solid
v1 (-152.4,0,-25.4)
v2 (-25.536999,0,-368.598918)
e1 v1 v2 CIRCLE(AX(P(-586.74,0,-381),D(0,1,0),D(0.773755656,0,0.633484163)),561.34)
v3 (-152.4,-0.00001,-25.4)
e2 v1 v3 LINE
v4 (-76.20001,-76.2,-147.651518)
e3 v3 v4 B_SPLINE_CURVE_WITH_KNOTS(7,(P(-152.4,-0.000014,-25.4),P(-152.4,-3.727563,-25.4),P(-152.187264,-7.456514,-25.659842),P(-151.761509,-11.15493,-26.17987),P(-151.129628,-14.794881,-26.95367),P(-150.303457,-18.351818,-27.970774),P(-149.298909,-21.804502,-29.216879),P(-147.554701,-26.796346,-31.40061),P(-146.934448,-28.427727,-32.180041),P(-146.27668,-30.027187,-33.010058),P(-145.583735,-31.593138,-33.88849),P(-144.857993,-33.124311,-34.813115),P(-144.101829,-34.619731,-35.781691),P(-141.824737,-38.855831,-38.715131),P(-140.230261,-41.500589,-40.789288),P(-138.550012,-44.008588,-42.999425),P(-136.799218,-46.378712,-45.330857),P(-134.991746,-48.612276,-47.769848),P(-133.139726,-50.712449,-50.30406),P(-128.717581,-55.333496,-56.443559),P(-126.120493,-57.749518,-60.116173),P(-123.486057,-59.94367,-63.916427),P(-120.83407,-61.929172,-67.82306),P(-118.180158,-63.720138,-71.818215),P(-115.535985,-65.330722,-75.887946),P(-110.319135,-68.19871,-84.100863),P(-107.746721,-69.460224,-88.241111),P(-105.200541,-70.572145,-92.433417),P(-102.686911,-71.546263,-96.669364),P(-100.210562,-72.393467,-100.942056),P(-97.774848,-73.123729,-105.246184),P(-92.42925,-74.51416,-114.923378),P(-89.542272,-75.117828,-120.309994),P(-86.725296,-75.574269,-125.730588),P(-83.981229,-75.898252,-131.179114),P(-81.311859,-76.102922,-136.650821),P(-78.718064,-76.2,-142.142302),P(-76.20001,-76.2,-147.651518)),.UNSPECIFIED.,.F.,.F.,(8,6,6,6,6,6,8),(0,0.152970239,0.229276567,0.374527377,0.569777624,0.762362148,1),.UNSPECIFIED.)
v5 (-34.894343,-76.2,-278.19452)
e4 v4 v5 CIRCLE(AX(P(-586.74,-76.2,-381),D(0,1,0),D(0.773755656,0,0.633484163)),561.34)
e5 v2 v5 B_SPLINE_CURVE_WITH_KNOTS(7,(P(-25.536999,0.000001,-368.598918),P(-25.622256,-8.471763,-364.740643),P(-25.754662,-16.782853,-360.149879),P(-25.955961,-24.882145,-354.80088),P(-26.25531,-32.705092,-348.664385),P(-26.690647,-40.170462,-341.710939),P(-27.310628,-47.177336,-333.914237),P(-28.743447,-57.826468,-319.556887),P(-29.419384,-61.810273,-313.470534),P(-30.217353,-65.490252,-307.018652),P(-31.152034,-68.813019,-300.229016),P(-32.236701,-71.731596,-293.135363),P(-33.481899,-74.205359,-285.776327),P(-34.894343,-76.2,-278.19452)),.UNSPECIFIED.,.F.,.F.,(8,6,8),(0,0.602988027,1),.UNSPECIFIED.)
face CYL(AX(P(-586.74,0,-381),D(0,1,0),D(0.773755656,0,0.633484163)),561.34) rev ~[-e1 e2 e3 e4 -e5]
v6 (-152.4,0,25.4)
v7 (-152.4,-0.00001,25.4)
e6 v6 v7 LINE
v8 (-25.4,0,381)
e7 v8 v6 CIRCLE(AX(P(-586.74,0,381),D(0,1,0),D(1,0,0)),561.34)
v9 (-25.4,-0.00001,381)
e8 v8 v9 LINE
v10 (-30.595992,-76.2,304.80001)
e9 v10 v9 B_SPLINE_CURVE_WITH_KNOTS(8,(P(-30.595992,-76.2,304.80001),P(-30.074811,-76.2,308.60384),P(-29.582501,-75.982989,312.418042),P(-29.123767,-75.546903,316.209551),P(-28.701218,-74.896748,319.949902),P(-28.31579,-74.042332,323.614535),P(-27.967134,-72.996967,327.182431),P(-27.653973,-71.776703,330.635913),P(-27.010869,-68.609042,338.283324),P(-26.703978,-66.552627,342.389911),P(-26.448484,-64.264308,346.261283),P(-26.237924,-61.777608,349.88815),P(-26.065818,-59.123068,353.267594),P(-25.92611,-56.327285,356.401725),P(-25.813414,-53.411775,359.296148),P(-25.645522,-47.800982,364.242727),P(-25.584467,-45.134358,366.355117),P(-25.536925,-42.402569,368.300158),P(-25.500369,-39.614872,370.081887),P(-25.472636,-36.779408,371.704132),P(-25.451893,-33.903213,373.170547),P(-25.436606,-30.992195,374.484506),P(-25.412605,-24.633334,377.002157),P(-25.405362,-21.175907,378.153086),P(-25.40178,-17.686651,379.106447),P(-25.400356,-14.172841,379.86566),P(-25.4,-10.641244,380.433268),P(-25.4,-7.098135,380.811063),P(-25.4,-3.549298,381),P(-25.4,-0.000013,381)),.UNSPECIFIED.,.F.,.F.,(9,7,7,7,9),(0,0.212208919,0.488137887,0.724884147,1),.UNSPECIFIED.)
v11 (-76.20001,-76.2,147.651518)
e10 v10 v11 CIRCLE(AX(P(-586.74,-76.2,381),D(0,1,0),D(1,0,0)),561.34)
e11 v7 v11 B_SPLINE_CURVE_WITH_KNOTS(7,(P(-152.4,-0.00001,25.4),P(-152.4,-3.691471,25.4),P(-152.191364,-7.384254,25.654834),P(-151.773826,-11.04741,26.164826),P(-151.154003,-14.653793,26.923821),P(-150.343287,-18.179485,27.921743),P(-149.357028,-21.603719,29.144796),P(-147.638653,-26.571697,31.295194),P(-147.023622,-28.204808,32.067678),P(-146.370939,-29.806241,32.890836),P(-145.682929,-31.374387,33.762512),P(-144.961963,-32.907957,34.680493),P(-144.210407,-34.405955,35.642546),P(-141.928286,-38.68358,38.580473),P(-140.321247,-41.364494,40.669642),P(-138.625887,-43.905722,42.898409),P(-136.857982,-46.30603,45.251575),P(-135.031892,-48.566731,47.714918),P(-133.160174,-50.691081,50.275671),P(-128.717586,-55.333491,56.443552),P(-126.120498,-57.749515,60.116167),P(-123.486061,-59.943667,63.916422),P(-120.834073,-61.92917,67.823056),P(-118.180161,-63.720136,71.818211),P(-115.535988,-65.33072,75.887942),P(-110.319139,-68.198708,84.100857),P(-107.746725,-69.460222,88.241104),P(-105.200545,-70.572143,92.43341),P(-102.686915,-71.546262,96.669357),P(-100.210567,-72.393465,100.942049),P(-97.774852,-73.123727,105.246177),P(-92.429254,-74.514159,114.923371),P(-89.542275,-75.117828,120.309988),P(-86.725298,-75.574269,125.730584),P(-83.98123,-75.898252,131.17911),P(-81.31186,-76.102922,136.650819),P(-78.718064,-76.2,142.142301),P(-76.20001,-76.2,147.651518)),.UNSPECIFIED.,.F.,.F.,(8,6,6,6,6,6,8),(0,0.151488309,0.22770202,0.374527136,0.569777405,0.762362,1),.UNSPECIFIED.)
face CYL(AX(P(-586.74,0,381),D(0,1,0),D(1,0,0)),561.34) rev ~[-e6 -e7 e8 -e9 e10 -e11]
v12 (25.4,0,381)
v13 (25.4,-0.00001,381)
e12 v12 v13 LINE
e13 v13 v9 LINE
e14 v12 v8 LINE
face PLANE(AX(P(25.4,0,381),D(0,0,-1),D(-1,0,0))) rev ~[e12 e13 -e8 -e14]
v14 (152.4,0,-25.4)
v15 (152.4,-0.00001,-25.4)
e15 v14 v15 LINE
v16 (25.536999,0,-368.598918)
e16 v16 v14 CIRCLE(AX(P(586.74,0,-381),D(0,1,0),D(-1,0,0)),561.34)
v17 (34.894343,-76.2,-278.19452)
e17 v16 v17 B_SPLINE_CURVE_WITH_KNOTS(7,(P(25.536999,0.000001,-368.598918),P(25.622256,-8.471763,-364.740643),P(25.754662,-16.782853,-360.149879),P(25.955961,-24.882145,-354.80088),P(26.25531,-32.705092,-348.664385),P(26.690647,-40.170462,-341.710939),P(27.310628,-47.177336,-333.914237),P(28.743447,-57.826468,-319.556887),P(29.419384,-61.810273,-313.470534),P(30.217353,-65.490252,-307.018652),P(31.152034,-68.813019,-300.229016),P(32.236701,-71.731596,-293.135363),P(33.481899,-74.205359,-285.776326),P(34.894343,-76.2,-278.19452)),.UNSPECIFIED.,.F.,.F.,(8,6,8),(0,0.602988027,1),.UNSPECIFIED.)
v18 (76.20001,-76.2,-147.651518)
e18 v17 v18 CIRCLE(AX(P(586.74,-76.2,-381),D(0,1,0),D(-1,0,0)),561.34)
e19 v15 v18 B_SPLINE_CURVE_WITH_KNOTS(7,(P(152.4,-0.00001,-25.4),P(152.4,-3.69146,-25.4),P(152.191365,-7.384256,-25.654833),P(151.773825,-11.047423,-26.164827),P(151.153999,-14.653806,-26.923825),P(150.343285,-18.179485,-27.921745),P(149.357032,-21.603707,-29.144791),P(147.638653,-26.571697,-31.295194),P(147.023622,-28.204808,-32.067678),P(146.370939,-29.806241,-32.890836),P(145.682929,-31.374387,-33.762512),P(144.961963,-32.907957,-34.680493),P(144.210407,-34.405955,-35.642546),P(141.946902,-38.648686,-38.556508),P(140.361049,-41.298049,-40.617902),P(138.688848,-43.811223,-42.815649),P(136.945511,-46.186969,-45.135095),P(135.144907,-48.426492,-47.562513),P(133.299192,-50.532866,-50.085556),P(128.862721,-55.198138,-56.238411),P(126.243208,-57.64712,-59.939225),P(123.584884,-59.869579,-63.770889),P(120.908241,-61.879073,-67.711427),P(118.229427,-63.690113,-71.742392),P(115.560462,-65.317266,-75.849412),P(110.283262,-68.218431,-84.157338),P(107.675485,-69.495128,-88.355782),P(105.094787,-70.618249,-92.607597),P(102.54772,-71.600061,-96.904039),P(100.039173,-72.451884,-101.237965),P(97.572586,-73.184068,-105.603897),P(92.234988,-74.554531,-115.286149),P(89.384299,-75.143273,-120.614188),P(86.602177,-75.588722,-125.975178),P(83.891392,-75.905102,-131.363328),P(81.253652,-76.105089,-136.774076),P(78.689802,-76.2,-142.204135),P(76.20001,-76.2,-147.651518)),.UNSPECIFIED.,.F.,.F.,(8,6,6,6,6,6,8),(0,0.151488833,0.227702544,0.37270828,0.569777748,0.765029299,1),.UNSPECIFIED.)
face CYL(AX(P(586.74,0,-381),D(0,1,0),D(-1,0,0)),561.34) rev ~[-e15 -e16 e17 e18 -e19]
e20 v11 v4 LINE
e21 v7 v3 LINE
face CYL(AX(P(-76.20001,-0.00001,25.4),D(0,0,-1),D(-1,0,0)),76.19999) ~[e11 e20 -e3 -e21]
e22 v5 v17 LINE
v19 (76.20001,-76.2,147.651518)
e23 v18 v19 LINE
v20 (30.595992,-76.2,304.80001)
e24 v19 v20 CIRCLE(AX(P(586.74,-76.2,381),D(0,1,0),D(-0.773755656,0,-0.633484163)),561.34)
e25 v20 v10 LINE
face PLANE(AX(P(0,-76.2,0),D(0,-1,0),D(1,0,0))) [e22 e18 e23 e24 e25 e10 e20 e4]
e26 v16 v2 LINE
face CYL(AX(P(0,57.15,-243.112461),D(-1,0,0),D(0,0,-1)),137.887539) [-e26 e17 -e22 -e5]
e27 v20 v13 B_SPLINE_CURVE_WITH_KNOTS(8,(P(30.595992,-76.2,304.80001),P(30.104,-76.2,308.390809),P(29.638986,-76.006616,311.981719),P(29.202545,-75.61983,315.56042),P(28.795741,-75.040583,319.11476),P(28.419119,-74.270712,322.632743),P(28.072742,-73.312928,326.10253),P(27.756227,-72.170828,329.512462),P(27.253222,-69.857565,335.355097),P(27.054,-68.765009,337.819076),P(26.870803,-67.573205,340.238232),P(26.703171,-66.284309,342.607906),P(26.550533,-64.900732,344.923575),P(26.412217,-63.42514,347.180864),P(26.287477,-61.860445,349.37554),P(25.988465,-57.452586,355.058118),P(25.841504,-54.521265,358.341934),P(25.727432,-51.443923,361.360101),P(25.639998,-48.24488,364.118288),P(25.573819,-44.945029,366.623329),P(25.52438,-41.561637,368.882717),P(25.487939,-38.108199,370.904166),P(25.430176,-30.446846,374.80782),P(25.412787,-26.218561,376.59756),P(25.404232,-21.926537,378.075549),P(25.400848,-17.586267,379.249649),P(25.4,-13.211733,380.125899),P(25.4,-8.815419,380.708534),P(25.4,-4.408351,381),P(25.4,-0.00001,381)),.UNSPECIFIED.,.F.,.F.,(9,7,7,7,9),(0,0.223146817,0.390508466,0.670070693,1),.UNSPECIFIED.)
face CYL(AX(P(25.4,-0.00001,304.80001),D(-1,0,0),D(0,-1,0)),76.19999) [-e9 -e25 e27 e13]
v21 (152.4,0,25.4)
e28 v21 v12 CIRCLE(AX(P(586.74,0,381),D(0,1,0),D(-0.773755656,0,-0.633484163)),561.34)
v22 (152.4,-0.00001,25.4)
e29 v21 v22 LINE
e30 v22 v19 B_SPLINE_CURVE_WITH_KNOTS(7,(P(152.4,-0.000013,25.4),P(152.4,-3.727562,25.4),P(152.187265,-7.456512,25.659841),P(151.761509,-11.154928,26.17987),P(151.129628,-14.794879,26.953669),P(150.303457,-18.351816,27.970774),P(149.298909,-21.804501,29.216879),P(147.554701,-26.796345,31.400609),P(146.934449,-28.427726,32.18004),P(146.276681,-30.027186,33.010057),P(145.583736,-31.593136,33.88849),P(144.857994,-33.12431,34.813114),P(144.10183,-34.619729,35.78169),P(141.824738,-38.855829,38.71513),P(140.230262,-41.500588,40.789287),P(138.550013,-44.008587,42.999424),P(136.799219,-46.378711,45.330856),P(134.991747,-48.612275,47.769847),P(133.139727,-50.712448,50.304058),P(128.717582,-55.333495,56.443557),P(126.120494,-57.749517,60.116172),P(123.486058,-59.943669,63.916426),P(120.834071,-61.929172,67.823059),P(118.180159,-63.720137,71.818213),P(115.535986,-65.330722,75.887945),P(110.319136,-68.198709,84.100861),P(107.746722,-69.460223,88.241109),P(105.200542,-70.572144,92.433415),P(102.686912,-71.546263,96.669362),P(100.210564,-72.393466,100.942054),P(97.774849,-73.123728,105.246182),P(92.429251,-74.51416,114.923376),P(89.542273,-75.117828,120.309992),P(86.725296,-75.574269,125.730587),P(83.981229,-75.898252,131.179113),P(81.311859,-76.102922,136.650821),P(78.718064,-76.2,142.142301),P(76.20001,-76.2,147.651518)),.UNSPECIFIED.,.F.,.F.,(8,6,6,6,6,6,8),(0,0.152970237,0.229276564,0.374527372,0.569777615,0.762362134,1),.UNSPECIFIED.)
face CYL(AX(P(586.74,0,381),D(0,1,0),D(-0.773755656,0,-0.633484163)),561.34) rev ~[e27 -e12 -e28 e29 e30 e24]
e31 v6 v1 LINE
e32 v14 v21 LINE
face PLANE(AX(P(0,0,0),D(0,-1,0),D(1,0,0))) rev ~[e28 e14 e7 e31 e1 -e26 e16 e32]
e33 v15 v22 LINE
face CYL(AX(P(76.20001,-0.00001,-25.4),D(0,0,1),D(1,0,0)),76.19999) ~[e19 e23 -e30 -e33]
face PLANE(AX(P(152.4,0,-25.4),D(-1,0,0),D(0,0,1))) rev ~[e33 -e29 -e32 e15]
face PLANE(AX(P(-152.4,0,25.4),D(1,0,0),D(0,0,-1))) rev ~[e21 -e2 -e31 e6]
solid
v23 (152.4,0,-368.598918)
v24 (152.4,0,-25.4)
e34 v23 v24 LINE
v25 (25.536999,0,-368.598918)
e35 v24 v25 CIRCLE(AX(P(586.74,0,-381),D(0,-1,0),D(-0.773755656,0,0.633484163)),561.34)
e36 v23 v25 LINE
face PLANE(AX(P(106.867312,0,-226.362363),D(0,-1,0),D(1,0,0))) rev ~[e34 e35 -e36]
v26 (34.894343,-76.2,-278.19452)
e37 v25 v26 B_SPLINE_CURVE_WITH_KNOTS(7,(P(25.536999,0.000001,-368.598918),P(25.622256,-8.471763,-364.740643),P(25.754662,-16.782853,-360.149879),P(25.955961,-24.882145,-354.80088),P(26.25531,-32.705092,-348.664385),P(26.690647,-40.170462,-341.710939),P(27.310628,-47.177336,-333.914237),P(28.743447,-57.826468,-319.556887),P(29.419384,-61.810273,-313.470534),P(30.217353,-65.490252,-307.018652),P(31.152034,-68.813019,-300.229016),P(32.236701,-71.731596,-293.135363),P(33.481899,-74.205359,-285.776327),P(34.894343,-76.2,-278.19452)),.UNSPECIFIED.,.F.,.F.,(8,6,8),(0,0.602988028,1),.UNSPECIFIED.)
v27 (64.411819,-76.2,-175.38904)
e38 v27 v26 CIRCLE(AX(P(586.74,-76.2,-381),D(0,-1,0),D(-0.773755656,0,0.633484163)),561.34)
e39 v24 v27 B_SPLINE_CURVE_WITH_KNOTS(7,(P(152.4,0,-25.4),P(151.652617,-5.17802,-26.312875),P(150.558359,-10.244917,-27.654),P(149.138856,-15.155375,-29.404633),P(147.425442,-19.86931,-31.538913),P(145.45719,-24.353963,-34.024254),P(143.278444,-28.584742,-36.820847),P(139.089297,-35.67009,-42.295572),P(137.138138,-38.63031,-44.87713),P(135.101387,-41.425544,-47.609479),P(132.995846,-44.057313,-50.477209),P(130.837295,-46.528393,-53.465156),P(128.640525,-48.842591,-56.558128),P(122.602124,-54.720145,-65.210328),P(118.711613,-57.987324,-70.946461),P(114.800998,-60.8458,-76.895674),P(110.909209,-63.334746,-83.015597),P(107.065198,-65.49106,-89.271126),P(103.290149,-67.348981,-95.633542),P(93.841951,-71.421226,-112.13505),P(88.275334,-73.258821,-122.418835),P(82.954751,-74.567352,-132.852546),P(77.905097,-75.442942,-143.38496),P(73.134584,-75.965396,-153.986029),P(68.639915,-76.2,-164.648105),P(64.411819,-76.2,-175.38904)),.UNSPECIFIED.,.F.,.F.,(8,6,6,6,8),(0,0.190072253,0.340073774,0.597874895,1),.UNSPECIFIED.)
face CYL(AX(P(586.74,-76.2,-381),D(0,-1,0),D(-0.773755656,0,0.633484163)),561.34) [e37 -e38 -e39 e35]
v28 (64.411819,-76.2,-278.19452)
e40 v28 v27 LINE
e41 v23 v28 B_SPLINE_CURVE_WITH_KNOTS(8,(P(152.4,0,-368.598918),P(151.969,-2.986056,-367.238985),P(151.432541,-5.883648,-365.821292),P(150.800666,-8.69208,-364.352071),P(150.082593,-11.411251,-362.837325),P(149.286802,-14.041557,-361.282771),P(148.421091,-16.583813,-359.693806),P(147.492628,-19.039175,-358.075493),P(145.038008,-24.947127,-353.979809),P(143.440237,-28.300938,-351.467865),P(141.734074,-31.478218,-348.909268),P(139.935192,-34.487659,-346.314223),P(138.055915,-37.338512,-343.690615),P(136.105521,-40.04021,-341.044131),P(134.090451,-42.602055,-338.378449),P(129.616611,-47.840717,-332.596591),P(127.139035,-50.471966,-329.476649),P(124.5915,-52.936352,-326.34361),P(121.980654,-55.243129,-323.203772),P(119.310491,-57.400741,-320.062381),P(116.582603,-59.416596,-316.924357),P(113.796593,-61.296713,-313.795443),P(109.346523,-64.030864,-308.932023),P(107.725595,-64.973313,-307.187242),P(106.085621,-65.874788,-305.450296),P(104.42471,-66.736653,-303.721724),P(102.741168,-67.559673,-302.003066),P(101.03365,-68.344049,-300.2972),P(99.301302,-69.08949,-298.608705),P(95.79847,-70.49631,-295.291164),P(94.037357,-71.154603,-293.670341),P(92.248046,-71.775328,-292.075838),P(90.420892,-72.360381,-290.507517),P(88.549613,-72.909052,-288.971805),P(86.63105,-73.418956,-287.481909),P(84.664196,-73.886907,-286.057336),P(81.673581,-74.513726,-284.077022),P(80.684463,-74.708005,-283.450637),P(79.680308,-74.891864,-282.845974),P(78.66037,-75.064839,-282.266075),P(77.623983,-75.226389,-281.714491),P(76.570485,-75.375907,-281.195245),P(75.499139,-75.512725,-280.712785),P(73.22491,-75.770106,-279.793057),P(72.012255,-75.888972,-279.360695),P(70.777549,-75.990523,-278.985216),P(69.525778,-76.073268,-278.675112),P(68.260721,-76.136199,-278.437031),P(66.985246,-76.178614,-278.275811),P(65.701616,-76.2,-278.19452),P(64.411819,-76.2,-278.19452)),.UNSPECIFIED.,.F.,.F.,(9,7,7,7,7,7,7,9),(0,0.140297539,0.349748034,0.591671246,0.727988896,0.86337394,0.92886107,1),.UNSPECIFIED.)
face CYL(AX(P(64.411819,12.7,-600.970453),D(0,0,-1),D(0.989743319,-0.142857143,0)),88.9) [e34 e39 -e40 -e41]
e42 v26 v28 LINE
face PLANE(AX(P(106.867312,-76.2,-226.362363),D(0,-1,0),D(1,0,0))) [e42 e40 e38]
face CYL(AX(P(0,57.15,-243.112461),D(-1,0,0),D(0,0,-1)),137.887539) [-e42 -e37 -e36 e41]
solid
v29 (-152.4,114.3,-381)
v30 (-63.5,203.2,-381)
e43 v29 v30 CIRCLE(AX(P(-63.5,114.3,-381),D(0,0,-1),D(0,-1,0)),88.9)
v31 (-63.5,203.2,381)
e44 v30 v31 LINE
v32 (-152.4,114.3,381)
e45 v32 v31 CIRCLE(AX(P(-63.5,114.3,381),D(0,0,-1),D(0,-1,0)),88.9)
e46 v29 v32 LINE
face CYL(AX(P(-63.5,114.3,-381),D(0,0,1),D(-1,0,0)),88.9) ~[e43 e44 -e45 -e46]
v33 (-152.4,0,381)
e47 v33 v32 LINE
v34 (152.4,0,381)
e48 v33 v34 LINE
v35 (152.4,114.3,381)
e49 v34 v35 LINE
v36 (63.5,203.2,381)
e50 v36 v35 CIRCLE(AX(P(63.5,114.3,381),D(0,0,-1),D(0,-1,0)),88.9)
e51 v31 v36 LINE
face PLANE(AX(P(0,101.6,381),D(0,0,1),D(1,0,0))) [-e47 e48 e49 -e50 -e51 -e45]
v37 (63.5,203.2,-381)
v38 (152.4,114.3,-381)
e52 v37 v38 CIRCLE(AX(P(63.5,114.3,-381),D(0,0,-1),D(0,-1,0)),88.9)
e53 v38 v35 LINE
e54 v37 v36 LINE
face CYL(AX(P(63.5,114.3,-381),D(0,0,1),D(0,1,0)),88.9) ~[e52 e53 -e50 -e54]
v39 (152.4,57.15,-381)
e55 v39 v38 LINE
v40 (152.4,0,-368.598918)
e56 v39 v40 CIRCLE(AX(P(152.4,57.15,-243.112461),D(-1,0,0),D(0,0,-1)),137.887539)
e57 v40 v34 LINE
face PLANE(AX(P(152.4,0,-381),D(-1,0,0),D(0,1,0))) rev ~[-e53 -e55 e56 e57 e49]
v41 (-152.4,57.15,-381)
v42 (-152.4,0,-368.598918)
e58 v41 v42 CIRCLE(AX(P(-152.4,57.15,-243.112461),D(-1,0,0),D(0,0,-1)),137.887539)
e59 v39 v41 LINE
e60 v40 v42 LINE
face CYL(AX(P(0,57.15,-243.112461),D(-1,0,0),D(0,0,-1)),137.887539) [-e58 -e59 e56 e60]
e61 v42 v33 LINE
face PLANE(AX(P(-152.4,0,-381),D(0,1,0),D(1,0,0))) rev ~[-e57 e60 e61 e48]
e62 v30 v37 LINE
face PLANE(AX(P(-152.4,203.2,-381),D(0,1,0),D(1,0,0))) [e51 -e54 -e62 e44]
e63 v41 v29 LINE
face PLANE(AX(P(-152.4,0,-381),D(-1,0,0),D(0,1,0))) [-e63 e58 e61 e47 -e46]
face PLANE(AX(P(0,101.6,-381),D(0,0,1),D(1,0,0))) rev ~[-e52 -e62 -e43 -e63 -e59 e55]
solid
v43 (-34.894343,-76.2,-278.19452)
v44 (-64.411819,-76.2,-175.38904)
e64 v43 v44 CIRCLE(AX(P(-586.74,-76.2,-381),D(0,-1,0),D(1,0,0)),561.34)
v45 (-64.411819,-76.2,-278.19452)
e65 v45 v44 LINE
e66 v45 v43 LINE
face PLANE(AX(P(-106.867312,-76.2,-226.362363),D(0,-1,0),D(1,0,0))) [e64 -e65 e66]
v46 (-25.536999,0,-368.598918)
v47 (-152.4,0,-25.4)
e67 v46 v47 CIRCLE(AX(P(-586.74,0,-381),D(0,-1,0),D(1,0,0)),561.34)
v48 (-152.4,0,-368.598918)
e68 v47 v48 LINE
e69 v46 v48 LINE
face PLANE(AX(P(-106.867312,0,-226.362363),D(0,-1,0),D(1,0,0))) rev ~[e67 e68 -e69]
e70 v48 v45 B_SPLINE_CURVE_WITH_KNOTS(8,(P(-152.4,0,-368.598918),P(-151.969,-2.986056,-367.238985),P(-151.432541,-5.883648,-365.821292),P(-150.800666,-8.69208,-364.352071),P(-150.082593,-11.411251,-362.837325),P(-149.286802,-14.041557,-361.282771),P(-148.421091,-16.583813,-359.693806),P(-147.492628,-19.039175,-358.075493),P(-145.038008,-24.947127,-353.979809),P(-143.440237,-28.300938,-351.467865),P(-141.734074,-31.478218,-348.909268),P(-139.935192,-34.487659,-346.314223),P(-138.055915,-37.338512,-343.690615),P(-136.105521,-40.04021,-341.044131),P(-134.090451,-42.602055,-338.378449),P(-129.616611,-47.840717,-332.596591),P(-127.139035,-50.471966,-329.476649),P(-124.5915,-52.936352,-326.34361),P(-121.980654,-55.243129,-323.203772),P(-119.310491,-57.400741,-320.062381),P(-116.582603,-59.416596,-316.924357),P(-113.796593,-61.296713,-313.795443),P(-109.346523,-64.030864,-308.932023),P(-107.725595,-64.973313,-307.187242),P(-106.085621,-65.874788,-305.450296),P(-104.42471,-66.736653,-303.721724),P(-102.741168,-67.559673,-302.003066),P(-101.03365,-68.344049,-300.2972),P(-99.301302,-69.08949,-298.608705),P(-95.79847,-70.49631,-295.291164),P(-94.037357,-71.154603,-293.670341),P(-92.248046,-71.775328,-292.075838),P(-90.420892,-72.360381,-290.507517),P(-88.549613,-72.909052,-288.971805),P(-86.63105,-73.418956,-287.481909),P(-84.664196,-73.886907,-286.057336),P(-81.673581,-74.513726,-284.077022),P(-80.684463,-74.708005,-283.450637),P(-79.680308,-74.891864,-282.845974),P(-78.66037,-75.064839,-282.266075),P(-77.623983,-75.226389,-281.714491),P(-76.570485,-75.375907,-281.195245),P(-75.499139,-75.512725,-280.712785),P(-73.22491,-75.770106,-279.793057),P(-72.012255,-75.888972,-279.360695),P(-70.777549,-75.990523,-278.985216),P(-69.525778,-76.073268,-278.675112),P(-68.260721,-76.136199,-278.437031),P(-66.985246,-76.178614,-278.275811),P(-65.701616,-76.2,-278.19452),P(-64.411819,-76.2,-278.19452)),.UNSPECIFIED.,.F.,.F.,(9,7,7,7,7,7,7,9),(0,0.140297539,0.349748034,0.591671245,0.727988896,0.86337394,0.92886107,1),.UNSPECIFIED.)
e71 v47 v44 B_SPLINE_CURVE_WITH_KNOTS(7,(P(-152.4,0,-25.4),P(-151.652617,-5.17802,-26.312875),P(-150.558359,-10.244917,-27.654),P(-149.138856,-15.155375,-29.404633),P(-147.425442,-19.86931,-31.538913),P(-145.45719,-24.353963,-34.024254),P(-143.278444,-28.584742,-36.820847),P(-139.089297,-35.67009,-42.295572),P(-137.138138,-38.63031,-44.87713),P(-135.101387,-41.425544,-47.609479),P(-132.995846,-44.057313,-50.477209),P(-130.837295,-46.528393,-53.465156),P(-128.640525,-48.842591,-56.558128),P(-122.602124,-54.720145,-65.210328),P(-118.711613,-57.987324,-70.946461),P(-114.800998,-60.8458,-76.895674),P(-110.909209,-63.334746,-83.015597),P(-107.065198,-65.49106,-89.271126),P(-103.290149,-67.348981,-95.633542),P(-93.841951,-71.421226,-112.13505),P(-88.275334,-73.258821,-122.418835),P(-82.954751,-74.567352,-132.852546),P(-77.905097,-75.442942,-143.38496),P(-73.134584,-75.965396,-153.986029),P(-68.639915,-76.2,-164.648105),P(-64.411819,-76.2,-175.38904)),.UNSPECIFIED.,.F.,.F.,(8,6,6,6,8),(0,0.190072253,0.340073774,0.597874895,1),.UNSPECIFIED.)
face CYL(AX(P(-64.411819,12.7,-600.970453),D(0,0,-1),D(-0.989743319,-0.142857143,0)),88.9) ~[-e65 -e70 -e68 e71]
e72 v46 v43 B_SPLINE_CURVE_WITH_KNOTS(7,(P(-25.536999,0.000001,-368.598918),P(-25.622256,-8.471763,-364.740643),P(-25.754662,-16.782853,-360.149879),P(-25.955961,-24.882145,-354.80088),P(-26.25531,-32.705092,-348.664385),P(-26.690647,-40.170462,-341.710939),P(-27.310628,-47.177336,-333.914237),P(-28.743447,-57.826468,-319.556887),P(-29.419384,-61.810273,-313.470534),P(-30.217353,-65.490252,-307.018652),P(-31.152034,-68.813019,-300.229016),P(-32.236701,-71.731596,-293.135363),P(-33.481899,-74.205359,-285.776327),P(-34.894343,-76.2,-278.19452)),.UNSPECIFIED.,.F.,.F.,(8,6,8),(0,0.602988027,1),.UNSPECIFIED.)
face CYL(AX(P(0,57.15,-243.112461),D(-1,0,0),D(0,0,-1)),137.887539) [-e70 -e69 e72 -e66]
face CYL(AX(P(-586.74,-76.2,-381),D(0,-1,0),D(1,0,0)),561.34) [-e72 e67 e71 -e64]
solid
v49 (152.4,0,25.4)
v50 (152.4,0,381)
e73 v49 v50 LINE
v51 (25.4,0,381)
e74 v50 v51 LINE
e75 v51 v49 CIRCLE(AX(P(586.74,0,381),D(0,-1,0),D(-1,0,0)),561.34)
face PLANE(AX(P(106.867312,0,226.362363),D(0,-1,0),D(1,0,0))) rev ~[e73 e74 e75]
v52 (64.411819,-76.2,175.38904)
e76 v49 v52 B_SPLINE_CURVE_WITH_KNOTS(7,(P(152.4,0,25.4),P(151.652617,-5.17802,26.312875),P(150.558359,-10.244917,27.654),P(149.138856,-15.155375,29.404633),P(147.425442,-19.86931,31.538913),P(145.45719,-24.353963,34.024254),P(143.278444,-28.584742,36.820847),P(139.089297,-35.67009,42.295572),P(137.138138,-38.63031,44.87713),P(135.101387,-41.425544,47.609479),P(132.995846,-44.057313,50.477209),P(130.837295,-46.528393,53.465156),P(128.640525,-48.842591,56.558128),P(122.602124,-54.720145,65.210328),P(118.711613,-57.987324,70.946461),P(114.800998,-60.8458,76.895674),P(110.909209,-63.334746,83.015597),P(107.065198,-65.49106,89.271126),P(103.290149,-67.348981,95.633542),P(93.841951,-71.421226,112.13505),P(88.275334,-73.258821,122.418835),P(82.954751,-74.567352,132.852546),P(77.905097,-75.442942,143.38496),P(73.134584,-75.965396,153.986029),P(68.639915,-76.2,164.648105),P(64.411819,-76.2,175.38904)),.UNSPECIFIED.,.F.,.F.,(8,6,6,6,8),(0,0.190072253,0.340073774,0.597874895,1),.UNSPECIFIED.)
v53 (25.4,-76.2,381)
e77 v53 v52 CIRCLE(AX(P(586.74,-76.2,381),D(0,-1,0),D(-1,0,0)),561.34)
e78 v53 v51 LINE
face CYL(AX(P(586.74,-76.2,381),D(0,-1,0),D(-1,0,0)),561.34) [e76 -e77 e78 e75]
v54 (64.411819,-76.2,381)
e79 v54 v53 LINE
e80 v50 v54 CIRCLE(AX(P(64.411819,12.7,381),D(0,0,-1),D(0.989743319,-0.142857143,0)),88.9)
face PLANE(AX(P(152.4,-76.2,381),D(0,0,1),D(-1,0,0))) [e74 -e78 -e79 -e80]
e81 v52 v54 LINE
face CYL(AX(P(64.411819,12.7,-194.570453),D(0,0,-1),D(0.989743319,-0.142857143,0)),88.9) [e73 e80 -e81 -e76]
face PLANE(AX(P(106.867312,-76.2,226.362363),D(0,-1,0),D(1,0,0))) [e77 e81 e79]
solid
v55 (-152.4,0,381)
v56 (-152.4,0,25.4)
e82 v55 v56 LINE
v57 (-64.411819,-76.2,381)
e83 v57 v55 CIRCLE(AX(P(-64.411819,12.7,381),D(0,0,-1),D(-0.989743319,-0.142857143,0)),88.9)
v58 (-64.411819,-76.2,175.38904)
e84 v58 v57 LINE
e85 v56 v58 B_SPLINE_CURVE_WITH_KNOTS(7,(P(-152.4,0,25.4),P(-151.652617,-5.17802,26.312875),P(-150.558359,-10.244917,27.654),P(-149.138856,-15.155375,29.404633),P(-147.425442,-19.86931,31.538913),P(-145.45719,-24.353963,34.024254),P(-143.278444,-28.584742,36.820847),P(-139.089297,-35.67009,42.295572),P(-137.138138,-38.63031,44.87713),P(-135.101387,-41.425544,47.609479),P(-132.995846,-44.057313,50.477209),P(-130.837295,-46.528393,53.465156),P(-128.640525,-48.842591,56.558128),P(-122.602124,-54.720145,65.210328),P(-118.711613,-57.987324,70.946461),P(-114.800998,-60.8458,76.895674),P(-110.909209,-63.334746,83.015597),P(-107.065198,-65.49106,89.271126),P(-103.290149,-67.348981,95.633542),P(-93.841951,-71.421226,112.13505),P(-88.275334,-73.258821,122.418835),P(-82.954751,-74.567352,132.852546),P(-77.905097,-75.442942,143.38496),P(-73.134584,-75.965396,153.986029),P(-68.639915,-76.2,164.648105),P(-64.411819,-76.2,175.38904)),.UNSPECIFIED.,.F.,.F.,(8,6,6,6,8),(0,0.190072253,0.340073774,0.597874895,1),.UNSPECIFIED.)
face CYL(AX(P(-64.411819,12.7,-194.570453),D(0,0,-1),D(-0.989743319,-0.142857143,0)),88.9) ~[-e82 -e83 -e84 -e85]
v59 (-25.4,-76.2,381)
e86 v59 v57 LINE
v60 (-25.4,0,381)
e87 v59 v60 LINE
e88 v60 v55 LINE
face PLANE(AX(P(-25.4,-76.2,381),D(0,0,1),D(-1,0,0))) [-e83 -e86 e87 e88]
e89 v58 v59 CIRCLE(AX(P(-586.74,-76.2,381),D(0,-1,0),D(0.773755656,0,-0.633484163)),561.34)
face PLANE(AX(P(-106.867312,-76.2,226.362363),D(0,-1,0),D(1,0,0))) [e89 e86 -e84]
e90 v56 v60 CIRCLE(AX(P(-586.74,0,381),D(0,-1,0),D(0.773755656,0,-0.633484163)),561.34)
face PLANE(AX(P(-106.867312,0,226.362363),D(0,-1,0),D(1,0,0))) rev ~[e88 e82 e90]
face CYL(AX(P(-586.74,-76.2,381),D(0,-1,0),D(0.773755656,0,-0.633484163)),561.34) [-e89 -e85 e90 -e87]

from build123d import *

# Parameters (mm, degrees)
F2_W           = 304.8
F2_H           = 203.2
F3_DEPTH       = 762
F7_DEPTH       = 76.2
F8_F1_R        = 88.9
F8_F2_R        = 88.9
F8_2_T1_DEPTH  = 795.5409051225
F8_3_T1_DEPTH  = 795.5409051225
F8_4_T1_DEPTH  = 795.5409051225
F8_5_T1_DEPTH  = 795.5409051225
F10_DEPTH      = 76.2
F11_R          = 76.19999
F12_R          = 76.19999
F14_DEPTH      = 152.4010001
F14_DEPTH_BACK = 152.4010001


# Not quite as in the source:
# - a fillet or chamfer that OpenCascade refuses, or shapes differently, is made with other operations: its cross-section is extruded or revolved along the edge and cut away or added
# - a fillet or chamfer is up to 0.001 mm smaller than in the source, because OpenCascade refuses the exact size


with BuildPart() as f3:
    # F2 (on plane+point) → F3 (new body, through all)
    with BuildSketch(Plane.XY.offset(-381)):
        with Locations((0, 101.6)):
            Rectangle(F2_W, F2_H)
    extrude(amount=F3_DEPTH)

    # F8: fillet of radius 88.9 on 2 edges, made by hand

    # F8_f1
    f8_f1_edges = [f3.edges().sort_by_distance(p)[0] for p in [
        (-152.4, 203.2, 0),
    ]]
    fillet(f8_f1_edges, radius=F8_F1_R)

    # F8_f2
    f8_f2_edges = [f3.edges().sort_by_distance(p)[0] for p in [
        (152.4, 203.2, 0),
    ]]
    fillet(f8_f2_edges, radius=F8_F2_R)


with BuildPart() as f7:
    # F6 (on plane+point) → F7 (new body, through all)
    with BuildSketch(Plane.XZ.offset(76.2)):
        with BuildLine():
            Line((-25.4, 381), (-152.4, 381))
            Line((-152.4, 381), (-152.4, 25.4))
            ThreePointArc((-152.4, 25.4), (-58.1025953454, 192.2009269091), (-25.4, 381))
        make_face()
    extrude(amount=-F7_DEPTH)

    # F8#2: fillet of radius 88.9 on 1 edges, made by hand

    # F8_2_s2 → F8_2_t1 (cut)
    with BuildSketch(Plane.XY.offset(-194.5704525613)):
        with BuildLine():
            ThreePointArc((-152.4, 0), (-122.6105303014, -54.502083301), (-64.4118189755, -76.2))
            Line((-64.4118189755, -76.2), (-152.4, -76.2))
            Line((-152.4, -76.2), (-152.4, 0))
        make_face()
    extrude(amount=F8_2_T1_DEPTH, mode=Mode.SUBTRACT)


with BuildPart() as f7b:
    # F6 (on plane+point) → F7, piece 2 (new body, through all)
    with BuildSketch(Plane.XZ.offset(76.2)):
        with BuildLine():
            Line((152.4, 25.4), (152.4, 381))
            Line((152.4, 381), (25.4, 381))
            ThreePointArc((25.4, 381), (58.1025953454, 192.2009269091), (152.4, 25.4))
        make_face()
    extrude(amount=-F7_DEPTH)

    # F8#3: fillet of radius 88.9 on 1 edges, made by hand

    # F8_3_s2 → F8_3_t1 (cut)
    with BuildSketch(Plane.XY.offset(-194.5704525613)):
        with BuildLine():
            ThreePointArc((152.4, 0), (122.6105303014, -54.502083301), (64.4118189755, -76.2))
            Line((64.4118189755, -76.2), (152.4, -76.2))
            Line((152.4, -76.2), (152.4, 0))
        make_face()
    extrude(amount=F8_3_T1_DEPTH, mode=Mode.SUBTRACT)


with BuildPart() as f7c:
    # F6 (on plane+point) → F7, piece 3 (new body, through all)
    with BuildSketch(Plane.XZ.offset(76.2)):
        with BuildLine():
            Line((25.4, -381), (152.4, -381))
            Line((152.4, -381), (152.4, -25.4))
            ThreePointArc((152.4, -25.4), (58.1025953454, -192.2009269091), (25.4, -381))
        make_face()
    extrude(amount=-F7_DEPTH)

    # F8#4: fillet of radius 88.9 on 1 edges, made by hand

    # F8_4_s2 → F8_4_t1 (cut)
    with BuildSketch(Plane.XY.offset(-600.9704525612)):
        with BuildLine():
            ThreePointArc((152.4, 0), (122.6105303014, -54.502083301), (64.4118189755, -76.2))
            Line((64.4118189755, -76.2), (152.4, -76.2))
            Line((152.4, -76.2), (152.4, 0))
        make_face()
    extrude(amount=F8_4_T1_DEPTH, mode=Mode.SUBTRACT)


with BuildPart() as f7d:
    # F6 (on plane+point) → F7, piece 4 (new body, through all)
    with BuildSketch(Plane.XZ.offset(76.2)):
        with BuildLine():
            Line((-152.4, -381), (-25.4, -381))
            ThreePointArc((-25.4, -381), (-58.1025953454, -192.2009269091), (-152.4, -25.4))
            Line((-152.4, -25.4), (-152.4, -381))
        make_face()
    extrude(amount=-F7_DEPTH)

    # F8#5: fillet of radius 88.9 on 1 edges, made by hand

    # F8_5_s2 → F8_5_t1 (cut)
    with BuildSketch(Plane.XY.offset(-600.9704525612)):
        with BuildLine():
            ThreePointArc((-152.4, 0), (-122.6105303014, -54.502083301), (-64.4118189755, -76.2))
            Line((-64.4118189755, -76.2), (-152.4, -76.2))
            Line((-152.4, -76.2), (-152.4, 0))
        make_face()
    extrude(amount=F8_5_T1_DEPTH, mode=Mode.SUBTRACT)


with BuildPart() as f10:
    # F9 (on face) → F10 (new body, through all)
    with BuildSketch(Plane.XZ):
        with BuildLine():
            ThreePointArc((-64.4118189755, 175.3890399136), (-102.5626769357, 96.9667001384), (-152.4, 25.4))
            Line((-152.4, 25.4), (-152.4, -25.4))
            ThreePointArc((-152.4, -25.4), (-102.5626769357, -96.9667001384), (-64.4118189755, -175.3890399136))
            ThreePointArc((-64.4118189755, -175.3890399136), (-35.2391855236, -276.3603935794), (-25.4, -381))
            Line((-25.4, -381), (25.4, -381))
            ThreePointArc((25.4, -381), (35.2391855236, -276.3603935794), (64.4118189755, -175.3890399136))
            ThreePointArc((64.4118189755, -175.3890399136), (102.5626769357, -96.9667001384), (152.4, -25.4))
            Line((152.4, -25.4), (152.4, 25.4))
            ThreePointArc((152.4, 25.4), (102.5626769357, 96.9667001384), (64.4118189755, 175.3890399136))
            ThreePointArc((64.4118189755, 175.3890399136), (35.2391855236, 276.3603935794), (25.4, 381))
            Line((25.4, 381), (-25.4, 381))
            ThreePointArc((-25.4, 381), (-35.2391855236, 276.3603935794), (-64.4118189755, 175.3890399136))
        make_face()
    extrude(amount=F10_DEPTH)

    # F11 (radius 76.2 in the source; OpenCascade refuses exactly that, so slightly less here)
    f11_edges = [f10.edges().sort_by_distance(p)[0] for p in [
        (-152.4, -76.2, 0),
        (152.4, -76.2, 0),
    ]]
    fillet(f11_edges, radius=F11_R)

    # F12 (radius 76.2 in the source; OpenCascade refuses exactly that, so slightly less here)
    f12_edges = [f10.edges().sort_by_distance(p)[0] for p in [
        (0, -76.2, 381),
    ]]
    fillet(f12_edges, radius=F12_R)


with BuildPart() as f14_tool:
    # F13 (on Right) → F14 (new body, two sides)
    with BuildSketch(Plane.YZ) as f14_sk:
        with BuildLine():
            ThreePointArc((57.15, -381), (-27.0390569298, -352.3149155996), (-76.2, -278.1945199568))
            Line((-76.2, -278.1945199568), (-76.2, -381))
            Line((-76.2, -381), (57.15, -381))
        make_face()
    extrude(amount=-F14_DEPTH)
    extrude(f14_sk.sketch, amount=F14_DEPTH_BACK)


with BuildPart() as f3_1:
    add(f3.part)

    # F14: cut by f14_tool
    add(f14_tool.part, mode=Mode.SUBTRACT)


with BuildPart() as f7c_1:
    add(f7c.part)

    # F14: cut by f14_tool
    add(f14_tool.part, mode=Mode.SUBTRACT)


with BuildPart() as f7d_1:
    add(f7d.part)

    # F14: cut by f14_tool
    add(f14_tool.part, mode=Mode.SUBTRACT)


with BuildPart() as f10_1:
    add(f10.part)

    # F14: cut by f14_tool
    add(f14_tool.part, mode=Mode.SUBTRACT)


solid = Compound([f7.part, f7b.part, f3_1.part, f7c_1.part, f7d_1.part, f10_1.part])
